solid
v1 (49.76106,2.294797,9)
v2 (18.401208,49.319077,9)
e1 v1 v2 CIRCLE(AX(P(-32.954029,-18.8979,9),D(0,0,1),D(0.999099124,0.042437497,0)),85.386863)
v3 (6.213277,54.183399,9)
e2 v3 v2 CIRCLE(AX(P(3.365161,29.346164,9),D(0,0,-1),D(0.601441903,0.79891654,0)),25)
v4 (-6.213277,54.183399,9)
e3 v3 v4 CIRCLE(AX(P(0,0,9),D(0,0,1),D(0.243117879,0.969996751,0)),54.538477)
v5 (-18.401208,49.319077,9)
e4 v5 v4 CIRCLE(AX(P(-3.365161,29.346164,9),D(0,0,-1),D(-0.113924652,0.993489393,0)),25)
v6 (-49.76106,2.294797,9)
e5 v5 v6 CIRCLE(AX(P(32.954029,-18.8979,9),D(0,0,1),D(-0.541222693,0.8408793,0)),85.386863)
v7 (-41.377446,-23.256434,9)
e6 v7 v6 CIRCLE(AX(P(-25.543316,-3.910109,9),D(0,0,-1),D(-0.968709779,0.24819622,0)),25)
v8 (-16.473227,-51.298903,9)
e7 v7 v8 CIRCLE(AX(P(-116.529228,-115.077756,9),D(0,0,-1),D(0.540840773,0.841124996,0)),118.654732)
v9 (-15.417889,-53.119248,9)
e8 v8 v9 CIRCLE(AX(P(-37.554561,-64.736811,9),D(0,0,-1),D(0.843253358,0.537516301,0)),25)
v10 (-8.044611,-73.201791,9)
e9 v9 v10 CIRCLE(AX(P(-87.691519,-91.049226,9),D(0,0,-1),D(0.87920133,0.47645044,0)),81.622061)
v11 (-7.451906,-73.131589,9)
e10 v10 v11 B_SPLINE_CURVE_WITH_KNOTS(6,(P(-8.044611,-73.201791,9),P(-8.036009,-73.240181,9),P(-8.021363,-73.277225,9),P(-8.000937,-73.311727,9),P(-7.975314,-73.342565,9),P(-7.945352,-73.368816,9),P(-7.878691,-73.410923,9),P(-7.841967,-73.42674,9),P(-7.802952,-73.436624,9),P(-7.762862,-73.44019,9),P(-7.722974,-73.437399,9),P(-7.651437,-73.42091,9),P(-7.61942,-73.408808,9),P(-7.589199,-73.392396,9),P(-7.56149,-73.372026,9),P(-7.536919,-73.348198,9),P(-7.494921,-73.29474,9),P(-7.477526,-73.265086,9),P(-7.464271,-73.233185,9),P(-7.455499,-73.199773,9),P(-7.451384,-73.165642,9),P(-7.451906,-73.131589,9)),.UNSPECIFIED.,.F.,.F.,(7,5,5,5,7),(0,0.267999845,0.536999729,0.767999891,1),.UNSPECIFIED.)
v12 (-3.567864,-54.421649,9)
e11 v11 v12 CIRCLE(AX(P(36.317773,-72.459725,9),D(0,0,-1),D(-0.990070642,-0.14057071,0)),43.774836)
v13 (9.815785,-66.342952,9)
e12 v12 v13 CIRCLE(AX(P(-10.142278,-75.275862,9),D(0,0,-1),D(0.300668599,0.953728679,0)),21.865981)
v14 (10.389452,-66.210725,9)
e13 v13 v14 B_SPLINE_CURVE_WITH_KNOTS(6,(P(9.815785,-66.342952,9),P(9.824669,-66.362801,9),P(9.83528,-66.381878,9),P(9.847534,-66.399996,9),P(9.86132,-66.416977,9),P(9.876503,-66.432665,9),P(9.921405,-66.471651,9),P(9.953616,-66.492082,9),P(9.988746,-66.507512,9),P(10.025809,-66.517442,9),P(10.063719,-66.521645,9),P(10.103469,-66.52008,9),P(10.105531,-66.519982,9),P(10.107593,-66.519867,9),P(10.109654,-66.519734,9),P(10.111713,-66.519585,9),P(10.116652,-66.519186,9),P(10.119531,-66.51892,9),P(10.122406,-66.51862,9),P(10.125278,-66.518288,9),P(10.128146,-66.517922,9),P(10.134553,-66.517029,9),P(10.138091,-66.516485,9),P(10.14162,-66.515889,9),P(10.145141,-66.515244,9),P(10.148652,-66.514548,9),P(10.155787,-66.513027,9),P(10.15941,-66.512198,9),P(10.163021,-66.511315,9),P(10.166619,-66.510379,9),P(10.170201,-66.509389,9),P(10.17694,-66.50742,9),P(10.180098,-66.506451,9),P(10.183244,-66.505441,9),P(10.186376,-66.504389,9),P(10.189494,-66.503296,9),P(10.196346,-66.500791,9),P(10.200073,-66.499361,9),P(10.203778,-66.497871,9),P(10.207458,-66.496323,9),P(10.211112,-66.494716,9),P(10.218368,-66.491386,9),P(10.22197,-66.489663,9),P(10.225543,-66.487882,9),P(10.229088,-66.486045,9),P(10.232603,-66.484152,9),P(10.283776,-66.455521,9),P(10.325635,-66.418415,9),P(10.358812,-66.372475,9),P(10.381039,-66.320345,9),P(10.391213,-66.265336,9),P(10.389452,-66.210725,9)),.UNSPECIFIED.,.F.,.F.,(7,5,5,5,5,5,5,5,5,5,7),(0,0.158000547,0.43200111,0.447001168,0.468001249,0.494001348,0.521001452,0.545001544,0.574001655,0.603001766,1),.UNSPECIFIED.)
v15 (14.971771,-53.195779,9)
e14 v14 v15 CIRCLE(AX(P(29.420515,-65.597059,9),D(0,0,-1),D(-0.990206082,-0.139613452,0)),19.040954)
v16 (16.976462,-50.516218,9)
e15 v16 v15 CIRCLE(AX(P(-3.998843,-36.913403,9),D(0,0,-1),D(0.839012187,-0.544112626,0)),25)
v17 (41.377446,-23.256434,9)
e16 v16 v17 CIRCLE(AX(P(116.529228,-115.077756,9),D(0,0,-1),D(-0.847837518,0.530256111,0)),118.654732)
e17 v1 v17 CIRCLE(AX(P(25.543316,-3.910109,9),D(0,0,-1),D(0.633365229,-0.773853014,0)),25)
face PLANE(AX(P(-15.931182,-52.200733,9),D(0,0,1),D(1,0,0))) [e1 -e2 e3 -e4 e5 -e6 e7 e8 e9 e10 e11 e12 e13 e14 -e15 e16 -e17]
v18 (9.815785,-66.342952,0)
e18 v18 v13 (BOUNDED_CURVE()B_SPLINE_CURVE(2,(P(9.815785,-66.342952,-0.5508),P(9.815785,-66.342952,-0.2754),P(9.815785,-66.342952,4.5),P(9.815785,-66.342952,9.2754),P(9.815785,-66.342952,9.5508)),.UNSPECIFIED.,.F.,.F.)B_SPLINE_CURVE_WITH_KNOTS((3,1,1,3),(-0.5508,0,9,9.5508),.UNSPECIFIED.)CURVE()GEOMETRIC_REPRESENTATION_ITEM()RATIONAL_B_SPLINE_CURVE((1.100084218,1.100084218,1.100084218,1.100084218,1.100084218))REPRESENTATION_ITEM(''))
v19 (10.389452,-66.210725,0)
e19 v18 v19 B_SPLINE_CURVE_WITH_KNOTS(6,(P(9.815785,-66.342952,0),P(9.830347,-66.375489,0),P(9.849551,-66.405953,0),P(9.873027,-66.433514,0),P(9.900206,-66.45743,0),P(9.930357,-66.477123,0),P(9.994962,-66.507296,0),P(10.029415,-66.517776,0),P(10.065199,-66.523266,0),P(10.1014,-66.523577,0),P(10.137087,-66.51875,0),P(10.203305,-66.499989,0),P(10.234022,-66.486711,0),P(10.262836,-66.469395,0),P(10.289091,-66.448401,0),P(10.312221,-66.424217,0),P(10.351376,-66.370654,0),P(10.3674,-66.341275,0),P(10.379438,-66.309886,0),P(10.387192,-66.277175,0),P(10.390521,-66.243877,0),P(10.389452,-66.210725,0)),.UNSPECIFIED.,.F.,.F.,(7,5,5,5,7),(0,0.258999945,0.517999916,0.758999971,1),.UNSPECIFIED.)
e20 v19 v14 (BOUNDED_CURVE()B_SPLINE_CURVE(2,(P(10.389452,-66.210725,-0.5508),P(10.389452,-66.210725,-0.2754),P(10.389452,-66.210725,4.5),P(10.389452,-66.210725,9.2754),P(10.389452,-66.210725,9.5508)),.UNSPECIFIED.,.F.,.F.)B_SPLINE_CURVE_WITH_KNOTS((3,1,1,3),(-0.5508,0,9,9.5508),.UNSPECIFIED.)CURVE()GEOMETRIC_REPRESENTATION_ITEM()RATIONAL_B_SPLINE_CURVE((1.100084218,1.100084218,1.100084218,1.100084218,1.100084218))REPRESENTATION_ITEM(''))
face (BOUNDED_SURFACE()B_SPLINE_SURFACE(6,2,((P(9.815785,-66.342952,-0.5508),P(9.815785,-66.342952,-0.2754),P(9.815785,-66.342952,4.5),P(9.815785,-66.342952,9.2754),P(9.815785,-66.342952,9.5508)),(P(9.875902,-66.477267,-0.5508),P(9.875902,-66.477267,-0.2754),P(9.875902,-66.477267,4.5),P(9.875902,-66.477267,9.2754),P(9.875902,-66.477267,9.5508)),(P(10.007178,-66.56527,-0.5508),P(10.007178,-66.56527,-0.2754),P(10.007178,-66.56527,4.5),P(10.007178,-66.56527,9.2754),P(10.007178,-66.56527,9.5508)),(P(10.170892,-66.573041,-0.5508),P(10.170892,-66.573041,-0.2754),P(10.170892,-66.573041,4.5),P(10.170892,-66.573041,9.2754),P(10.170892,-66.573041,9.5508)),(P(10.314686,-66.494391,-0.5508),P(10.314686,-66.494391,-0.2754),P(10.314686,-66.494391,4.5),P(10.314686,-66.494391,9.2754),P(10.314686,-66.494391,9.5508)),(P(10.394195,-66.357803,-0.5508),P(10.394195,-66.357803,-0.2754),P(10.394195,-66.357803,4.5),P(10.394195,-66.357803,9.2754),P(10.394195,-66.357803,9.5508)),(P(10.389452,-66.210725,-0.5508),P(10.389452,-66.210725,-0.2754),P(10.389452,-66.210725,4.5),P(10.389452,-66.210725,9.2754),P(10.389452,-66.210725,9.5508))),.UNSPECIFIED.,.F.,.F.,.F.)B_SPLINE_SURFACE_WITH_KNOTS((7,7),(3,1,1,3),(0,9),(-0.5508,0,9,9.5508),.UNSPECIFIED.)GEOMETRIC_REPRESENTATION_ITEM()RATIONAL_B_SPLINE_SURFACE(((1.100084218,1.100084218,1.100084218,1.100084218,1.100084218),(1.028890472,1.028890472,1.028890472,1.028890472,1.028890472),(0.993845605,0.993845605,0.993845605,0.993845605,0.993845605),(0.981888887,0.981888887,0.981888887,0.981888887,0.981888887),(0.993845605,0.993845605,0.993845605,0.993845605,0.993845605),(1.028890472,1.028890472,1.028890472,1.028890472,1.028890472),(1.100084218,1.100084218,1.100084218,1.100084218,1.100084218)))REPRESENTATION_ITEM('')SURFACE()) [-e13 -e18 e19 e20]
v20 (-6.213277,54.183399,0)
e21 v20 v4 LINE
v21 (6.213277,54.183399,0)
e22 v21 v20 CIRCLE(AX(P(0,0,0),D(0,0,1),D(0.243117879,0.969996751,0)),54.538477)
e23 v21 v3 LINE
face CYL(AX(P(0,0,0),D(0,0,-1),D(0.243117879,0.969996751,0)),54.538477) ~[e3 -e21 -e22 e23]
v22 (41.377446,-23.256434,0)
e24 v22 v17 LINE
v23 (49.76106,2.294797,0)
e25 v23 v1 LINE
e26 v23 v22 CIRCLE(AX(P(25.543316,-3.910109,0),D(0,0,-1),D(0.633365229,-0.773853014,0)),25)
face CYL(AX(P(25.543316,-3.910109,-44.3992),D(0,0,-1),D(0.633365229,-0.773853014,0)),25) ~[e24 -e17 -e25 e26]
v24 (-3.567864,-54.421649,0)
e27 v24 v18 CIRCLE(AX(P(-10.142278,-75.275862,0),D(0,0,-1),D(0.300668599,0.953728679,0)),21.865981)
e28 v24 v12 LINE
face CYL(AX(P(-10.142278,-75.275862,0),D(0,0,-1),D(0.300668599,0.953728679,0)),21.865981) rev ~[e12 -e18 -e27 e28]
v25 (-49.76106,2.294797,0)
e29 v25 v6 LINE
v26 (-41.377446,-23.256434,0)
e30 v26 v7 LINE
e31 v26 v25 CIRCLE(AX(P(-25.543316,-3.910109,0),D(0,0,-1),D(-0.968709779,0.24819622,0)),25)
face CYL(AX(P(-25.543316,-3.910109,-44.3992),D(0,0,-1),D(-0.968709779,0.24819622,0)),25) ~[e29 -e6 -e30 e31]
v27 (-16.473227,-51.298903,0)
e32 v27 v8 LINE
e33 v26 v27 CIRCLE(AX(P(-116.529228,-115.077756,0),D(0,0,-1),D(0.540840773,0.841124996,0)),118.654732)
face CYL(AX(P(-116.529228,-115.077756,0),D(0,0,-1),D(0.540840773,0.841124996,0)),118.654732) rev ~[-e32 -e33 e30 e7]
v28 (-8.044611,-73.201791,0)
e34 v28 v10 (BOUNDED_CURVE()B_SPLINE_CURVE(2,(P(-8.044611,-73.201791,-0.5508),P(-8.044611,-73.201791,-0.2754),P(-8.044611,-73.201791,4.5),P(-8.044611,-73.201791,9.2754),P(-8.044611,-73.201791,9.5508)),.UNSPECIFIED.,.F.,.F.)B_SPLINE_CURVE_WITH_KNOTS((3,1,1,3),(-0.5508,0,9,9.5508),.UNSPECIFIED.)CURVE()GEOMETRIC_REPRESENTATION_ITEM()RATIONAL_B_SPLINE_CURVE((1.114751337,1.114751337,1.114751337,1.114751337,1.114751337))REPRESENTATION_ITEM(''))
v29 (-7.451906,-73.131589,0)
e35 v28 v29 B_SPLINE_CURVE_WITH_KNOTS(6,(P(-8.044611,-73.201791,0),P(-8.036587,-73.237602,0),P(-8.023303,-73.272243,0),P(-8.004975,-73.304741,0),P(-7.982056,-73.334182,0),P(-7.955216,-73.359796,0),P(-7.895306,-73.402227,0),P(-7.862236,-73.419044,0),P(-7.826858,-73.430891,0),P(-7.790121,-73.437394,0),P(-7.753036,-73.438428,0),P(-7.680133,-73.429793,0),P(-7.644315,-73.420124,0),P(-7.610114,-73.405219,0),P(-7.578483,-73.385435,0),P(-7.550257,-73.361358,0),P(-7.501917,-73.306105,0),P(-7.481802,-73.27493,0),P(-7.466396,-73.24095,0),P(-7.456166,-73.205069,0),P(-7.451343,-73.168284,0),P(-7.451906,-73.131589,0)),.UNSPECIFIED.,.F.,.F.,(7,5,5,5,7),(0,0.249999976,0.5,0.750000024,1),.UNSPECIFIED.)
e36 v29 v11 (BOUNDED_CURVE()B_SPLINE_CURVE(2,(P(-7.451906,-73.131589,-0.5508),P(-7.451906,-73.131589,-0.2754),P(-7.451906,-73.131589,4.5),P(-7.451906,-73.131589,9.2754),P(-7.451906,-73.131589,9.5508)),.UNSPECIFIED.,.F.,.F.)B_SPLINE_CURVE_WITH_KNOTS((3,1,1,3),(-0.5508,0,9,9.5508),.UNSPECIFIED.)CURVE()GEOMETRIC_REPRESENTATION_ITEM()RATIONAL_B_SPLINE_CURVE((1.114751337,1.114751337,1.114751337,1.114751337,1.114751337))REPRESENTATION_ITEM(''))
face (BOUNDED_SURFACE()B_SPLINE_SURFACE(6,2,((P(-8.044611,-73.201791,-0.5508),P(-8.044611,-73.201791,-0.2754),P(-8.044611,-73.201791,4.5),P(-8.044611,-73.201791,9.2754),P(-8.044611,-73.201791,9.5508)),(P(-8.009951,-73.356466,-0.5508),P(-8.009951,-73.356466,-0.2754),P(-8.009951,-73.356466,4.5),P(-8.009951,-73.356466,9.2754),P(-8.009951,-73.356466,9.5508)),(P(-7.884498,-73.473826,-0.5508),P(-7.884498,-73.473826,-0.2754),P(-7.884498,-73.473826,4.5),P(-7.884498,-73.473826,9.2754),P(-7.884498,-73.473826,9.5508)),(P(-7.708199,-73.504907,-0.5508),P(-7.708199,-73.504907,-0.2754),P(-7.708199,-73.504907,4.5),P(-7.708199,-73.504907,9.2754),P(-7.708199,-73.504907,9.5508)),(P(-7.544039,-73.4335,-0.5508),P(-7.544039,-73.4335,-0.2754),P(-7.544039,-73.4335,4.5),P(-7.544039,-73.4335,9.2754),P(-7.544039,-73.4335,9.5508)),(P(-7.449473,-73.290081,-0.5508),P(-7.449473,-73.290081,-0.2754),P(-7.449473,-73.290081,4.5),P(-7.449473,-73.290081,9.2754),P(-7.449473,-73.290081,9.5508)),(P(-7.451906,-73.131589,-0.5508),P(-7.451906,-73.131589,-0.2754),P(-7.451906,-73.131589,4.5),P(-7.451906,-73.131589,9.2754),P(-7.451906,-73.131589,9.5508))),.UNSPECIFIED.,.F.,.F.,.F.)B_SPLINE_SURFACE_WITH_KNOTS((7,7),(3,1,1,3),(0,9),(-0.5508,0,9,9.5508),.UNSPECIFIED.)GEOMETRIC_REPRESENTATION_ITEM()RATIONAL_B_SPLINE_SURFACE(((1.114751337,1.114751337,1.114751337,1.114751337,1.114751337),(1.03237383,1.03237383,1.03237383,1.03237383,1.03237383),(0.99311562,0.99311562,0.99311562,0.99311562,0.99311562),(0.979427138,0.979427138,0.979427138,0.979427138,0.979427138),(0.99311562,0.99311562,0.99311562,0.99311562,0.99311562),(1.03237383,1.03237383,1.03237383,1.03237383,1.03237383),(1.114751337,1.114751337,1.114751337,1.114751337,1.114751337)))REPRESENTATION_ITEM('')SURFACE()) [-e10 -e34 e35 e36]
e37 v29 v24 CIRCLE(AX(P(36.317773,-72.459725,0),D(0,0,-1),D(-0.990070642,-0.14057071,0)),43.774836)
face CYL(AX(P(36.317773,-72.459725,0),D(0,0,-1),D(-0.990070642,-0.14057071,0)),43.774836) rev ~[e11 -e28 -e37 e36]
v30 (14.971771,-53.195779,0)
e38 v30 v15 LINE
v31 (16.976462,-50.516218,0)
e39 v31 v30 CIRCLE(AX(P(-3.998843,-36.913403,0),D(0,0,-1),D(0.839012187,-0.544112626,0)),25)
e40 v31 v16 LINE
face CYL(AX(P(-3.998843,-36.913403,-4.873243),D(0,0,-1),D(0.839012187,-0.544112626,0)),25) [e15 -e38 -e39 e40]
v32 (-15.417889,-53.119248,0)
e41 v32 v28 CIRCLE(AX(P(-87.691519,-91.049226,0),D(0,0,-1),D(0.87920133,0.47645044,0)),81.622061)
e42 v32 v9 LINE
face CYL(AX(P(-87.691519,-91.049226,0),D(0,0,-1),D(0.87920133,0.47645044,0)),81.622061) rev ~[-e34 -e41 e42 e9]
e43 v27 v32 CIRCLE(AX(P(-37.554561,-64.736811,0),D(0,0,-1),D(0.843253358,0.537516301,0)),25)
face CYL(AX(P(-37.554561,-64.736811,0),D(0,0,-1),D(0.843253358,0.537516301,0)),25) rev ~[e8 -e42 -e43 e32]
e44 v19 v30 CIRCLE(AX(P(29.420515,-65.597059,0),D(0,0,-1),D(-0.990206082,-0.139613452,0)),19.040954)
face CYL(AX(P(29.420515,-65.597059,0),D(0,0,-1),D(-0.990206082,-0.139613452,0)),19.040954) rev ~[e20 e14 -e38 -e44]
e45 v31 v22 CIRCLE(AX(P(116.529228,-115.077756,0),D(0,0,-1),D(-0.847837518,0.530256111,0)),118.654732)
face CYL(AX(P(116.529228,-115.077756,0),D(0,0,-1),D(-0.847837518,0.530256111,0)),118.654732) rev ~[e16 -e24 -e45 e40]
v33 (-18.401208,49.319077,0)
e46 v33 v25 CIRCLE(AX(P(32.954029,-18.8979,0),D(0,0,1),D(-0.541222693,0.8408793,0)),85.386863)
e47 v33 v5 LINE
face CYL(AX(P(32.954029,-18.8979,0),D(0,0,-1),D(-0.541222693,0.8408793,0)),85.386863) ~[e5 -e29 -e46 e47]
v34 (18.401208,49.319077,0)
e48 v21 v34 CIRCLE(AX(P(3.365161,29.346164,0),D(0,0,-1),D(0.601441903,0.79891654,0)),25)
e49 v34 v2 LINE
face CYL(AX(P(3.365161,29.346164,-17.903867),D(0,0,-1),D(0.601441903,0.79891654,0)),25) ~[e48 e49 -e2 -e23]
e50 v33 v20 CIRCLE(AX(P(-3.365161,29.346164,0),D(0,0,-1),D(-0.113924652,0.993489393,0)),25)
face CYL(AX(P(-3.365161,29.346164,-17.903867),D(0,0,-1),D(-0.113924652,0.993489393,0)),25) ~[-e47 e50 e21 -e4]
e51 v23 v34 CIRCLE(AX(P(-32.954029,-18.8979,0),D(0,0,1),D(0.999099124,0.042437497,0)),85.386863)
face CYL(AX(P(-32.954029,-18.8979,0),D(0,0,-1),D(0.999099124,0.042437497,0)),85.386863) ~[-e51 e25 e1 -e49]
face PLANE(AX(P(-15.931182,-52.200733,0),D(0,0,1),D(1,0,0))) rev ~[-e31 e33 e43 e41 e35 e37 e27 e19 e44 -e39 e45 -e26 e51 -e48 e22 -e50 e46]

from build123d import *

# Parameters (mm, degrees)
F1_DEPTH    = 9
F2_DEPTH    = 9
F3_T1_DEPTH = 9
F3_T3_DEPTH = 97.7984007527
F3_T5_DEPTH = 18.7464853336
F3_T7_DEPTH = 44.8077335821
F4_F1_R     = 0.3
F4_F2_R     = 0.3


# Not quite as in the source:
# - a fillet or chamfer that OpenCascade refuses, or shapes differently, is made with other operations: its cross-section is extruded or revolved along the edge and cut away or added


with BuildPart() as f1:
    # F0 (on Top) → F1 (new body)
    with BuildSketch(Plane.XY):
        with BuildLine():
            ThreePointArc((52.3559108968, -15.2742949835), (41.1175441228, 23.5793695766), (13.2592789192, 52.9021456617))
            ThreePointArc((13.2592789192, 52.9021456617), (0, 54.5384771796), (-13.2592789192, 52.9021456617))
            ThreePointArc((-13.2592789192, 52.9021456617), (-41.1175441228, 23.5793695766), (-52.3559108968, -15.2742949835))
            ThreePointArc((-52.3559108968, -15.2742949835), (-32.1035122758, -31.703635387), (-15.9292943442, -52.1603592277))
            ThreePointArc((-15.9292943442, -52.1603592277), (-9.8139264878, -53.648227743), (-3.5678639787, -54.4216486309))
            ThreePointArc((-3.5678639787, -54.4216486309), (6.2832792085, -54.1753255224), (15.9292943442, -52.1603592277))
            ThreePointArc((15.9292943442, -52.1603592277), (32.1035122758, -31.703635387), (52.3559108968, -15.2742949835))
        make_face()
    extrude(amount=F1_DEPTH)

    # F0 (on Top) → F2 (join)
    with BuildSketch(Plane.XY):
        with BuildLine():
            ThreePointArc((-7.0224064402, -78.6131843925), (-7.0174520358, -66.2714702986), (-3.5678639787, -54.4216486309))
            ThreePointArc((-3.5678639787, -54.4216486309), (-9.8139264878, -53.648227743), (-15.9292943442, -52.1603592277))
            ThreePointArc((-15.9292943442, -52.1603592277), (-10.336712225, -65.0032144434), (-7.0224064402, -78.6131843925))
        make_face()
        with BuildLine():
            ThreePointArc((10.5660464615, -68.2554319501), (11.3560818324, -59.5775748336), (15.9292943442, -52.1603592277))
            ThreePointArc((15.9292943442, -52.1603592277), (6.2832792085, -54.1753255224), (-3.5678639787, -54.4216486309))
            ThreePointArc((-3.5678639787, -54.4216486309), (5.1525036315, -59.6492567371), (10.5660464615, -68.2554319501))
        make_face()
    extrude(amount=F2_DEPTH)

    # F3: fillet of radius 25 on 6 edges, made by hand

    # F3_s2 → F3_t1 (join)
    with BuildSketch(Plane.XY):
        with BuildLine():
            ThreePointArc((-16.4732265546, -51.2989033705), (-15.9263980679, -52.1979676734), (-15.4178890795, -53.1192475566))
            ThreePointArc((-15.4178890795, -53.1192475566), (-15.6719958304, -52.6389522584), (-15.9292943442, -52.1603592277))
            ThreePointArc((-15.9292943442, -52.1603592277), (-16.2003358533, -51.7290474995), (-16.4732265546, -51.2989033705))
        make_face()
    extrude(amount=F3_T1_DEPTH)

    # F3_s4 → F3_t3 (cut)
    with BuildSketch(Plane.XY.offset(-44.3992003763)):
        with BuildLine():
            ThreePointArc((41.3774463504, -23.2564339871), (49.2973579438, -11.704046911), (49.7610601076, 2.2947968664))
            ThreePointArc((49.7610601076, 2.2947968664), (51.5165033775, -6.4221025316), (52.3559108968, -15.2742949835))
            ThreePointArc((52.3559108968, -15.2742949835), (46.752445175, -19.108250225), (41.3774463504, -23.2564339871))
        make_face()
        with BuildLine():
            ThreePointArc((-49.7610601076, 2.2947968664), (-49.2973579438, -11.704046911), (-41.3774463504, -23.2564339871))
            ThreePointArc((-41.3774463504, -23.2564339871), (-46.752445175, -19.108250225), (-52.3559108968, -15.2742949835))
            ThreePointArc((-52.3559108968, -15.2742949835), (-51.5165033775, -6.4221025316), (-49.7610601076, 2.2947968664))
        make_face()
    extrude(amount=F3_T3_DEPTH, mode=Mode.SUBTRACT)

    # F3_s6 → F3_t5 (cut)
    with BuildSketch(Plane.XY.offset(-4.8732426668)):
        with BuildLine():
            ThreePointArc((16.9764615861, -50.5162181687), (16.0190019724, -51.8895795654), (14.9717711174, -53.195779387))
            ThreePointArc((14.9717711174, -53.195779387), (15.4409431776, -52.6692011973), (15.9292943442, -52.1603592277))
            ThreePointArc((15.9292943442, -52.1603592277), (16.4495016002, -51.3361382631), (16.9764615861, -50.5162181687))
        make_face()
    extrude(amount=F3_T5_DEPTH, mode=Mode.SUBTRACT)

    # F3_s8 → F3_t7 (cut)
    with BuildSketch(Plane.XY.offset(-17.903866791)):
        with BuildLine():
            ThreePointArc((18.4012083068, 49.3190772564), (12.6321038646, 52.5652026084), (6.2132770502, 54.1833985771))
            ThreePointArc((6.2132770502, 54.1833985771), (9.7573311543, 53.6585499414), (13.2592789192, 52.9021456617))
            ThreePointArc((13.2592789192, 52.9021456617), (15.8631283238, 51.1578030954), (18.4012083068, 49.3190772564))
        make_face()
        with BuildLine():
            ThreePointArc((-6.2132770502, 54.1833985771), (-12.6321038646, 52.5652026084), (-18.4012083068, 49.3190772564))
            ThreePointArc((-18.4012083068, 49.3190772564), (-15.8631283238, 51.1578030954), (-13.2592789192, 52.9021456617))
            ThreePointArc((-13.2592789192, 52.9021456617), (-9.7573311543, 53.6585499414), (-6.2132770502, 54.1833985771))
        make_face()
    extrude(amount=F3_T7_DEPTH, mode=Mode.SUBTRACT)

    # F4: fillet of radius 0.3 on 2 edges, made by hand

    # F4_f1
    f4_f1_edges = [f1.edges().sort_by_distance(p)[0] for p in [
        (-7.0224064402, -78.6131843925, 4.5),
    ]]
    fillet(f4_f1_edges, radius=F4_F1_R)

    # F4_f2
    f4_f2_edges = [f1.edges().sort_by_distance(p)[0] for p in [
        (10.5660464615, -68.2554319501, 4.5),
    ]]
    fillet(f4_f2_edges, radius=F4_F2_R)


solid = f1.part
